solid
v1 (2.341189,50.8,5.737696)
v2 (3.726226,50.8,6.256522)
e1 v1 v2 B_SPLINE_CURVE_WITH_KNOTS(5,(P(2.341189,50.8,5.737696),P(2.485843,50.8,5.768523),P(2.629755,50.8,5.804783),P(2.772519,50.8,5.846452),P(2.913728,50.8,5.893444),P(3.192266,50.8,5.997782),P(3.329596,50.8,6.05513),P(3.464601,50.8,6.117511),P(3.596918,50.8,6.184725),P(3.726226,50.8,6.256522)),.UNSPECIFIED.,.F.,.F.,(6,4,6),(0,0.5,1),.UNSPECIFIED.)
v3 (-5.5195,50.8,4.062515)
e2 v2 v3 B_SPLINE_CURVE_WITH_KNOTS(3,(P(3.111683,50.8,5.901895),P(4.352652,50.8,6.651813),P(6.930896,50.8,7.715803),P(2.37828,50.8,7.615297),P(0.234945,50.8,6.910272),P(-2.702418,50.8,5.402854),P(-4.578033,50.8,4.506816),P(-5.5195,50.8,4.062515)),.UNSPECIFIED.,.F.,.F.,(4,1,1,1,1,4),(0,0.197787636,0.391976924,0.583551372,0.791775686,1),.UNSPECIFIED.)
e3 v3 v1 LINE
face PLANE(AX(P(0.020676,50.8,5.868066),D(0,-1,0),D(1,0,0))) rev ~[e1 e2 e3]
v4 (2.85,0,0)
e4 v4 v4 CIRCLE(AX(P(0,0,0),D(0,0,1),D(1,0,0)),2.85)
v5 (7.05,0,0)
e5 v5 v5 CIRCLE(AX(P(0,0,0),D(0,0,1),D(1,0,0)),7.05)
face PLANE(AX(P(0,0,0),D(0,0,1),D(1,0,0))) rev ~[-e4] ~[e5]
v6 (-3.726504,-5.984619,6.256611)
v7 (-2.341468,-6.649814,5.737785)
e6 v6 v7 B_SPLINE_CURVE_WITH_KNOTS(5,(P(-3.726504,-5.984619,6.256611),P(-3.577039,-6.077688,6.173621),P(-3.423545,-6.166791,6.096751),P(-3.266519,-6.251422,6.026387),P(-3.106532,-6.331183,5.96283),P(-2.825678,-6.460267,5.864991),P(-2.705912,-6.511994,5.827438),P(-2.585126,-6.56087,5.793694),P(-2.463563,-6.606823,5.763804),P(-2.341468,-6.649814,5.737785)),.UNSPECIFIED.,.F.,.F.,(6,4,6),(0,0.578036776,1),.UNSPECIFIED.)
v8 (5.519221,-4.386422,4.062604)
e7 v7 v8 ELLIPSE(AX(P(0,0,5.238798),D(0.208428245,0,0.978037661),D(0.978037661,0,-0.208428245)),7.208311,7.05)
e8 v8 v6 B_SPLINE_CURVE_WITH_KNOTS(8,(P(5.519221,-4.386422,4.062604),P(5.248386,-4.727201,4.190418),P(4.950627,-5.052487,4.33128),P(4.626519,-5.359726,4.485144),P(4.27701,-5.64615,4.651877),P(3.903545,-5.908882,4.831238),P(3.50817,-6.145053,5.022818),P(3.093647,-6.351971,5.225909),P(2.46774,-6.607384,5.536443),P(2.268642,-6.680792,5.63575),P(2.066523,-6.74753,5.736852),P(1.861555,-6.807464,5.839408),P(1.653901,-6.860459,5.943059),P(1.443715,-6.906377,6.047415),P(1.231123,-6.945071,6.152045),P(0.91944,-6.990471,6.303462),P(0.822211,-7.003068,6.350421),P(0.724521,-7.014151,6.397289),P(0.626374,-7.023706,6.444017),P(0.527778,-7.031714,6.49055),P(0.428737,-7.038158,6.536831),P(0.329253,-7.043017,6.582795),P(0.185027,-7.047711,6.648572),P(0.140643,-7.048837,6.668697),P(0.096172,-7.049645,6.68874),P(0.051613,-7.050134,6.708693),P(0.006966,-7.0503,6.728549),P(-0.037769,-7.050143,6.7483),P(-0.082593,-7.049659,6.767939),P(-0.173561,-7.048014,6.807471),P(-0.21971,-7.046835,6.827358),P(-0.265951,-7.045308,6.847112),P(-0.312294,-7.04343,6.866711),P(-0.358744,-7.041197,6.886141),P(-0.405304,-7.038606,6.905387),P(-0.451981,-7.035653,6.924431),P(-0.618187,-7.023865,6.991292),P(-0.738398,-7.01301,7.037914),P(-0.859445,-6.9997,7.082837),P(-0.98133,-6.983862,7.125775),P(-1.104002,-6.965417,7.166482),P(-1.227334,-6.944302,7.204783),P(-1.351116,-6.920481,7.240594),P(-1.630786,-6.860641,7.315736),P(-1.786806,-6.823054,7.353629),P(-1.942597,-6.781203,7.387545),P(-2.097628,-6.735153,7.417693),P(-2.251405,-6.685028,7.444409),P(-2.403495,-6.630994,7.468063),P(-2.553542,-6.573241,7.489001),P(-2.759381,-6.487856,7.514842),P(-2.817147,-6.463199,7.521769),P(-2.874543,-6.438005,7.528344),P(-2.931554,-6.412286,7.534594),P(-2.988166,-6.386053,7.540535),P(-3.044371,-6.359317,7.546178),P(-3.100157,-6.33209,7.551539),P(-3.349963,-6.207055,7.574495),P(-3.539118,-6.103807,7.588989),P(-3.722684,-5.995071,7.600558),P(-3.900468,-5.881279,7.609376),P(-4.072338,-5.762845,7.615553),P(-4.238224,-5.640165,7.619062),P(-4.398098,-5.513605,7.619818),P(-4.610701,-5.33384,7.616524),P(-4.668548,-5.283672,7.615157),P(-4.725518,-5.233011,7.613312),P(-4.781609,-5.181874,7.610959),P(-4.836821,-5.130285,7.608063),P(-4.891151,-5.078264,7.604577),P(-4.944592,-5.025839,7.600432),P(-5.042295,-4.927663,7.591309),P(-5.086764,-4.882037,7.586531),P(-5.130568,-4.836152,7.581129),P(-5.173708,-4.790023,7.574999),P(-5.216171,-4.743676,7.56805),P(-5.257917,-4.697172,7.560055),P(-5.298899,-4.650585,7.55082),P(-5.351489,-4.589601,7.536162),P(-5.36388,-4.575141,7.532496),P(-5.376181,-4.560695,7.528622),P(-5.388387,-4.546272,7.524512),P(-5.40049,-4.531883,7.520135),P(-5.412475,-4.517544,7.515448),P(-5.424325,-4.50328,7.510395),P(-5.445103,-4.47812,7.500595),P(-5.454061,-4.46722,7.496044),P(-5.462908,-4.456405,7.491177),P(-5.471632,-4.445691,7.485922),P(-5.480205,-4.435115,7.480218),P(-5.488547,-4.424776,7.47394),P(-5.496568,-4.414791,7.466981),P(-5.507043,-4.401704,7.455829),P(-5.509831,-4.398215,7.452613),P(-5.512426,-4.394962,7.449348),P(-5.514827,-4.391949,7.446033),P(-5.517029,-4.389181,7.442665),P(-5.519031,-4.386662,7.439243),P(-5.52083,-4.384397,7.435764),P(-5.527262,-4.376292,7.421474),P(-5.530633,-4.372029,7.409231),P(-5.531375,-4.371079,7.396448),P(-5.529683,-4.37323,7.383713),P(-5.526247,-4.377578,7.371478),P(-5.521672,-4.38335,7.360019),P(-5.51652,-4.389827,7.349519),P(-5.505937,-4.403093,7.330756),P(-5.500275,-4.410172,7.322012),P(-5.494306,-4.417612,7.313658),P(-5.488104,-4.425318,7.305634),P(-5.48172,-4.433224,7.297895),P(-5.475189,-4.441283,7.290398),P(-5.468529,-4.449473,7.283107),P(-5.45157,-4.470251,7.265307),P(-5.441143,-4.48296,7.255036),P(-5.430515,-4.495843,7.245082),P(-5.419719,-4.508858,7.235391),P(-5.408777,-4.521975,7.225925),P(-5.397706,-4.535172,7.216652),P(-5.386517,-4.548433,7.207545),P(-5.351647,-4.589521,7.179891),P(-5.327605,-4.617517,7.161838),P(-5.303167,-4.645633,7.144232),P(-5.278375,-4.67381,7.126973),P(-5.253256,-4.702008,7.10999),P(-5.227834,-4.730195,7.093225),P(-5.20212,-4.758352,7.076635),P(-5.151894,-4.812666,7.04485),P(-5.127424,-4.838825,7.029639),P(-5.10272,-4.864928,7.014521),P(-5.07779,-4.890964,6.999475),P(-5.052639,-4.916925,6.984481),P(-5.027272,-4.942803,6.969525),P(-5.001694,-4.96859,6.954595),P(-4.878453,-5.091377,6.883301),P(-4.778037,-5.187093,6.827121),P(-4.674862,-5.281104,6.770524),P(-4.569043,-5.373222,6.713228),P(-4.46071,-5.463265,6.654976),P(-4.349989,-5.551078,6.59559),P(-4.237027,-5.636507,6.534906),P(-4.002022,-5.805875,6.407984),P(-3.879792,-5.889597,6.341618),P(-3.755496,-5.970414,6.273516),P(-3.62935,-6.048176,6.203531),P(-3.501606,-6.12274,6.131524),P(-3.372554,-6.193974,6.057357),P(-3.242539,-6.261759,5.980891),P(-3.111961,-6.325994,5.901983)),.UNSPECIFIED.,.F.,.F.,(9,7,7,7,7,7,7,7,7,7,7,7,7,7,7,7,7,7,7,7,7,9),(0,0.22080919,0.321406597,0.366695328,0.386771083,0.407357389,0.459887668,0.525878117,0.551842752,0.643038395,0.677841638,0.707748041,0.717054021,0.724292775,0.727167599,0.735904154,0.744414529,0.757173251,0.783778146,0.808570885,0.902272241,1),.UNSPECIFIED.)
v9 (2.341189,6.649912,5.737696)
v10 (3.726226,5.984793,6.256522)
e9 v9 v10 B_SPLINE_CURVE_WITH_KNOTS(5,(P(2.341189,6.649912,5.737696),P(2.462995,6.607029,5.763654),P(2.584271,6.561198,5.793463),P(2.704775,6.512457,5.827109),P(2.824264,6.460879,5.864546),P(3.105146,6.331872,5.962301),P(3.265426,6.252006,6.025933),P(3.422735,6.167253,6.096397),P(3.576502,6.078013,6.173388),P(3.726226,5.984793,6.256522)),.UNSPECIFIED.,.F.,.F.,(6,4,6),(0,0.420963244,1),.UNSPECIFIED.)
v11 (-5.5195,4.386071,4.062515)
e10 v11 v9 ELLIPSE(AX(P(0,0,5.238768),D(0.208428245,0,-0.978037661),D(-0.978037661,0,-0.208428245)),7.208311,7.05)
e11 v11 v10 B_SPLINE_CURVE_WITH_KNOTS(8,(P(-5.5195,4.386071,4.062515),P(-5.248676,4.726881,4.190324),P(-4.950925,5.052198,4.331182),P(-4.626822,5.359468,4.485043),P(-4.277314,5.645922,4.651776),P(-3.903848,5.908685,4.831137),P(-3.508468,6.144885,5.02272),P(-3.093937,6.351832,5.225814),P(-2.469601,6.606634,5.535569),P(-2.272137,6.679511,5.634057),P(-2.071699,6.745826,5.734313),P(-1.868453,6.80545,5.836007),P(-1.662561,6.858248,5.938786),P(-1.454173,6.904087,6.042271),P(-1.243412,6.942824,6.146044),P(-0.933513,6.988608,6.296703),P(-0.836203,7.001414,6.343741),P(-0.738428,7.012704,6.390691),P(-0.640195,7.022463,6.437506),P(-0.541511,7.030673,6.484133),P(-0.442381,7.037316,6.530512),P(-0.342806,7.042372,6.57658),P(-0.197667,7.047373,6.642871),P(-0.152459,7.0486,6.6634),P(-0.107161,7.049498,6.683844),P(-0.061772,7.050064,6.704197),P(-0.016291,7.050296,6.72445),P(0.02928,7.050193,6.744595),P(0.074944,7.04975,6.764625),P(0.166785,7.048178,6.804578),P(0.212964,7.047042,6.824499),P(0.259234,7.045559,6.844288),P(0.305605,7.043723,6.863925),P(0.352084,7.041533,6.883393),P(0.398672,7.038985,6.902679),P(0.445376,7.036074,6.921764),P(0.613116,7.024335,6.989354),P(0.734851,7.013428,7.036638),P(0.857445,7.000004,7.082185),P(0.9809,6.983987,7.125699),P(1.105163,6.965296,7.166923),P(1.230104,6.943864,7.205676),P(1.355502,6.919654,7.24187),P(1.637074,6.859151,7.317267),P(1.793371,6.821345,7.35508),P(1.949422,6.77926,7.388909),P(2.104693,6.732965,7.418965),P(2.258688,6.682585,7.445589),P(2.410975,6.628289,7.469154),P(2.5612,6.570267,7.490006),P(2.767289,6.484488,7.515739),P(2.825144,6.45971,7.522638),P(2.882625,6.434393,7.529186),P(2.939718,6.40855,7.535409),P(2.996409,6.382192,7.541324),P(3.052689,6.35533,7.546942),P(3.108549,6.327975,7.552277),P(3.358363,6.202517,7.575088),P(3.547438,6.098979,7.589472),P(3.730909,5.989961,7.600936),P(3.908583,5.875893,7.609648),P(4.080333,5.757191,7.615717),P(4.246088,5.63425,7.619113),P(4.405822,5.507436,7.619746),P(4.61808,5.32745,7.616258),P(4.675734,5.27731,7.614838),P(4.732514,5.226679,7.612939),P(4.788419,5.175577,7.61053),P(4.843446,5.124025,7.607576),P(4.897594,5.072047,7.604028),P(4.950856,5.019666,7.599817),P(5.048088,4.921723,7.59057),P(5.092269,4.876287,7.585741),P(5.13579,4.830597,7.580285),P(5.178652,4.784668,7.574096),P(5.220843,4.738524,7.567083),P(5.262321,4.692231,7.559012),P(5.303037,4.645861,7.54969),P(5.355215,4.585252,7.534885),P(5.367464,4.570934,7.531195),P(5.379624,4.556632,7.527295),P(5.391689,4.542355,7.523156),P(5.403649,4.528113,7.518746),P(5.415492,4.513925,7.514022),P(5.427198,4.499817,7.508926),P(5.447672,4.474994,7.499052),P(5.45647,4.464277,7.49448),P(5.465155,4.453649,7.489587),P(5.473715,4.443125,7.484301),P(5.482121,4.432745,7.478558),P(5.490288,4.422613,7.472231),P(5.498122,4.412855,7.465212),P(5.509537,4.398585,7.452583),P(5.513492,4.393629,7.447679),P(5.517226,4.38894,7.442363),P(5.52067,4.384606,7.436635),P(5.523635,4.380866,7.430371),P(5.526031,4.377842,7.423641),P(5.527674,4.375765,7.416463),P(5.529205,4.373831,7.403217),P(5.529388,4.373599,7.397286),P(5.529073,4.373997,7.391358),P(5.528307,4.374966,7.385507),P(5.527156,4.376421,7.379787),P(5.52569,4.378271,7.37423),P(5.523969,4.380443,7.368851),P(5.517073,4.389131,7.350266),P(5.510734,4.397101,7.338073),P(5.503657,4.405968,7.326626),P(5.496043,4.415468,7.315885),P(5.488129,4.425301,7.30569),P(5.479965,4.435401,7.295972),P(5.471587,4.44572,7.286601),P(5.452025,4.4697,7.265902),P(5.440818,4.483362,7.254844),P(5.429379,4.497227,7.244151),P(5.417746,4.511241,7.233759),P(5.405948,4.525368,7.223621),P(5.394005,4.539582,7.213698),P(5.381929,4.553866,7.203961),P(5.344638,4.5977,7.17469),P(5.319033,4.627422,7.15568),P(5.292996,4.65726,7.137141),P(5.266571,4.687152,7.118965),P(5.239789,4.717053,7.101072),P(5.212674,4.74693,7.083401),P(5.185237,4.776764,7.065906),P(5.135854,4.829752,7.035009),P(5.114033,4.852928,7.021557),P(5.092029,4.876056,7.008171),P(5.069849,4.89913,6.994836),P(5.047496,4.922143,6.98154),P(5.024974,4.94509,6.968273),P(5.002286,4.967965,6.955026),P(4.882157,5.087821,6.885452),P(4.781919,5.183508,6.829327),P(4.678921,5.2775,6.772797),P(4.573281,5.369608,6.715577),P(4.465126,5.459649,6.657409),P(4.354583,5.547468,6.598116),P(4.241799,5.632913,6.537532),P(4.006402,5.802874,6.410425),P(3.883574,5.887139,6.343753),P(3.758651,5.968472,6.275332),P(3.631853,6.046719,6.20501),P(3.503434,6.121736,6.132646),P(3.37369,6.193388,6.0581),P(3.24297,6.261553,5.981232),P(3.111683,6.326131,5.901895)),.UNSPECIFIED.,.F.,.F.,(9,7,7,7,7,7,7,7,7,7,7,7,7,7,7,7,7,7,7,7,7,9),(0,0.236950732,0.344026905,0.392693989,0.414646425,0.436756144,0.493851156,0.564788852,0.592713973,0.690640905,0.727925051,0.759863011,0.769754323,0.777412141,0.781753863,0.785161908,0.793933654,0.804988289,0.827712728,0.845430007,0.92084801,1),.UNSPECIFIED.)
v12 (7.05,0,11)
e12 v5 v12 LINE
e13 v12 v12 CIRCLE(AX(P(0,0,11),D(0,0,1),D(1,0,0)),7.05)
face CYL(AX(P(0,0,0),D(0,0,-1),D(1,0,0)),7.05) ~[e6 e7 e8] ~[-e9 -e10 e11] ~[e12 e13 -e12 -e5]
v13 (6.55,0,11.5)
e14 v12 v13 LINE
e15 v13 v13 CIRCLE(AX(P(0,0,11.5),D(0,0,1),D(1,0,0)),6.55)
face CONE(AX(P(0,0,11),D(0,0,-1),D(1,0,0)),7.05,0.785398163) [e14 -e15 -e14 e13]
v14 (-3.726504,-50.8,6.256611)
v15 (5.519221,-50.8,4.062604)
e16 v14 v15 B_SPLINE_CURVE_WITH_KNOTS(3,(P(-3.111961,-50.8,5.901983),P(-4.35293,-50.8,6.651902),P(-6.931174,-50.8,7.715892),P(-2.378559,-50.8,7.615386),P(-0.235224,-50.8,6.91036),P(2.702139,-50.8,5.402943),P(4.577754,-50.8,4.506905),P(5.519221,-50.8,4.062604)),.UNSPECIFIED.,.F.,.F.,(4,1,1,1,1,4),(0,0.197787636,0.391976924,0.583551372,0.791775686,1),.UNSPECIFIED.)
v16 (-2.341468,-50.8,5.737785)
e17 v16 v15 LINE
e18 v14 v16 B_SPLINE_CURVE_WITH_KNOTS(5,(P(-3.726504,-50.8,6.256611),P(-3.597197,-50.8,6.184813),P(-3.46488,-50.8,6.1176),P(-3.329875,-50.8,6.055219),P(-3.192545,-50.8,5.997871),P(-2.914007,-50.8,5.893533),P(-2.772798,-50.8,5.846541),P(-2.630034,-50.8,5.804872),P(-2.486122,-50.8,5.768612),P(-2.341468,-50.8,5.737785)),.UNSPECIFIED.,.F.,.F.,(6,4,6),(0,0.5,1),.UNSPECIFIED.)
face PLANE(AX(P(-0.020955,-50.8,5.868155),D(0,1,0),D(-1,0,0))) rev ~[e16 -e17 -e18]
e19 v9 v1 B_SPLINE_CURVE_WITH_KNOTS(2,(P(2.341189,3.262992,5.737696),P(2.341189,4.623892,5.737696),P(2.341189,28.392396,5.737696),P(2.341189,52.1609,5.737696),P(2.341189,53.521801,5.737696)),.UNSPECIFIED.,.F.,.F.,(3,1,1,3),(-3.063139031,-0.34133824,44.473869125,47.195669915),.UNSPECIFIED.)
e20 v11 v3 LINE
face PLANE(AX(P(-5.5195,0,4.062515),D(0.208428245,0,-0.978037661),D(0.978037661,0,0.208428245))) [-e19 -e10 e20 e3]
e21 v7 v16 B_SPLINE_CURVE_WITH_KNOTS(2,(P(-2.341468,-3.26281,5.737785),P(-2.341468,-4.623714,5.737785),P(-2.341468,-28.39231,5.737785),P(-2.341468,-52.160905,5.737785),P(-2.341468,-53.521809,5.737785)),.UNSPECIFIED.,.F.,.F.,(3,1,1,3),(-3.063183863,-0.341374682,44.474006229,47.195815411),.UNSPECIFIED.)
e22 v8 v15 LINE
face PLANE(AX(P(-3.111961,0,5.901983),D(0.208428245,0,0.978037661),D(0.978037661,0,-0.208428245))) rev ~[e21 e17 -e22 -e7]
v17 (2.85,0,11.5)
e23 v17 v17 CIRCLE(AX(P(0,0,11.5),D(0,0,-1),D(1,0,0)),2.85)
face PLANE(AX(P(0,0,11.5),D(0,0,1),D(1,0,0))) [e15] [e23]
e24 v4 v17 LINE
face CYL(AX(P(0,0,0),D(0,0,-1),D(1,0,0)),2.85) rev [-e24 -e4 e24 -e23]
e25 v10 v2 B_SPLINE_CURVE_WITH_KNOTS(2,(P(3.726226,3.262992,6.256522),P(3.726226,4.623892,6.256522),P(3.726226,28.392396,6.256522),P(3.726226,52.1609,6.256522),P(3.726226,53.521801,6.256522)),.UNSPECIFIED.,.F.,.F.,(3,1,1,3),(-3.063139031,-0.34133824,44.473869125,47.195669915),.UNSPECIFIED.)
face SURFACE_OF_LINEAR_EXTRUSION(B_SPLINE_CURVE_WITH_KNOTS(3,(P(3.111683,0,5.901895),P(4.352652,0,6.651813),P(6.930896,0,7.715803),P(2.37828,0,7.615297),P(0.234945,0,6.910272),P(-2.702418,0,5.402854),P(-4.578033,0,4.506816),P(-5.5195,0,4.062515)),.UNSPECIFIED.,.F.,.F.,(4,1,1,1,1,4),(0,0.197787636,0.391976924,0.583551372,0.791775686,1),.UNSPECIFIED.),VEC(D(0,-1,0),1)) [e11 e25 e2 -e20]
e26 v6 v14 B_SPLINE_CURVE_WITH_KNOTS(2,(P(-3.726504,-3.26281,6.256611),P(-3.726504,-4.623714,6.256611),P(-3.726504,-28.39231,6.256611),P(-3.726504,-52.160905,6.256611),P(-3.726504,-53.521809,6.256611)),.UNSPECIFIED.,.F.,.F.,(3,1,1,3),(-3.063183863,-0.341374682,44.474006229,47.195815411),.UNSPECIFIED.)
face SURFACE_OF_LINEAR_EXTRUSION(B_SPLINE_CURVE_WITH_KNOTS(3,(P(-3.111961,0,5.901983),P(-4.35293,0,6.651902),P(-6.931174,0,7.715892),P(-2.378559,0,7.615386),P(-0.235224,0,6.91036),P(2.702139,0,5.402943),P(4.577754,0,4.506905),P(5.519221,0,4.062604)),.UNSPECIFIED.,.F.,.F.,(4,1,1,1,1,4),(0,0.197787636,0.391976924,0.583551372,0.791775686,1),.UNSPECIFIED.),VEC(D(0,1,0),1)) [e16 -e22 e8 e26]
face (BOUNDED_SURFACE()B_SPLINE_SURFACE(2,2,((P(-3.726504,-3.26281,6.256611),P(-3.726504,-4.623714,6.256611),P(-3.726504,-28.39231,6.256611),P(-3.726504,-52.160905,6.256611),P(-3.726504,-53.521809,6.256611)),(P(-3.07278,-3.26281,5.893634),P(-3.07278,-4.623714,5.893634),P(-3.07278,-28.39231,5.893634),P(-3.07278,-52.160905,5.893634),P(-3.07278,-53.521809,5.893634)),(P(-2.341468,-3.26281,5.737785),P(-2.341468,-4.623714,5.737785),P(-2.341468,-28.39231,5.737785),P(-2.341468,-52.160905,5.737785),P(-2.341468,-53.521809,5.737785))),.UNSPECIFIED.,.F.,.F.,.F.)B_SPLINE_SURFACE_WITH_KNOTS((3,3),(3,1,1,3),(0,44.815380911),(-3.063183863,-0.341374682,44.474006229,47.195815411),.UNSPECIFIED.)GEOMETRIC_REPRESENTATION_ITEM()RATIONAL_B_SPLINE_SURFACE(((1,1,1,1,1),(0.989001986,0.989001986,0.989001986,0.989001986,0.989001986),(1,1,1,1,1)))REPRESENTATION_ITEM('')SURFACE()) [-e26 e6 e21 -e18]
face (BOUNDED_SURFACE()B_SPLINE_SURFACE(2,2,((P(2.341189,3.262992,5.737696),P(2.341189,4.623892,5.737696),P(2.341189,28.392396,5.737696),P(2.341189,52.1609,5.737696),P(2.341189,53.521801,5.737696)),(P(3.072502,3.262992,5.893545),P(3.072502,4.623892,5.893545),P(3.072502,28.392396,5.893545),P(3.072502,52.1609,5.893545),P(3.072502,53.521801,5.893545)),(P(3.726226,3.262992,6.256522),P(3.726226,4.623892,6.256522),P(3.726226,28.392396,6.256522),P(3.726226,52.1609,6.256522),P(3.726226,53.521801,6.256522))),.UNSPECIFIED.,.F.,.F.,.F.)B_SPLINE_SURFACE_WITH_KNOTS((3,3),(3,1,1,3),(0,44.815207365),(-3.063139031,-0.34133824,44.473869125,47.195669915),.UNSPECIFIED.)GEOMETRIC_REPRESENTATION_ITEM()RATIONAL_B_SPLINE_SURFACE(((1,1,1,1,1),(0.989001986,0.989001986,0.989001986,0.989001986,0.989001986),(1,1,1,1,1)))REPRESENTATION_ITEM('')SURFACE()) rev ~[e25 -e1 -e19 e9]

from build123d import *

# Parameters (mm, degrees)
F0_R     = 7.05
F0_R_2   = 2.85
F1_DEPTH = 11.5
F3_DEPTH = 50.8
F4_R     = 5
F6_DEPTH = 50.8
F7_R     = 5
F8_DEPTH = 25
F9_SIZE  = 0.5


# Not quite as in the source:
# - a feature names something its author has since deleted; it is built from what else it names


with BuildPart() as f1:
    # F0 (on Top) → F1 (new body)
    with BuildSketch(Plane.XY):
        Circle(F0_R)
        Circle(F0_R_2, mode=Mode.SUBTRACT)
        Circle(F0_R_2)
    extrude(amount=F1_DEPTH)

    # F2 (on Front) → F3 (join)
    with BuildSketch(Plane.XZ):
        with BuildLine():
            add(Edge.make_bspline(
                [(-3.1119612486, 5.9019833995), (-4.352930456, 6.6519015813), (-6.9311743253, 7.7158918454), (-2.3785587972, 7.6153860853), (-0.2352237379, 6.910360475), (2.7021392414, 5.4029427526), (4.5777539416, 4.5069045056), (5.5192211105, 4.0626041336)],
                knots=[0, 0, 0, 0, 0.1977876363, 0.3919769243, 0.5835513721, 0.7917756861, 1, 1, 1, 1], degree=3))
            Line((-3.1119612486, 5.9019833995), (5.5192211105, 4.0626041336))
        make_face()
    extrude(amount=F3_DEPTH)

    # F4
    f4_edges = [f1.edges().sort_by_distance(p)[0] for p in [
        (-3.111961, -28.562997, 5.901983),
    ]]
    fillet(f4_edges, radius=F4_R)

    # F5 (on Front) → F6 (join)
    with BuildSketch(Plane.XZ):
        with BuildLine():
            Line((-5.5194998324, 4.0625152563), (3.1116825268, 5.9018945222))
            add(Edge.make_bspline(
                [(3.1116825268, 5.9018945222), (4.3526517342, 6.651812704), (6.9308956034, 7.7158029681), (2.3782800753, 7.615297208), (0.2349450161, 6.9102715977), (-2.7024179633, 5.4028538753), (-4.5780326634, 4.5068156283), (-5.5194998324, 4.0625152563)],
                knots=[0, 0, 0, 0, 0.1977876363, 0.3919769243, 0.5835513721, 0.7917756861, 1, 1, 1, 1], degree=3))
        make_face()
    extrude(amount=-F6_DEPTH)

    # F7
    f7_edges = [f1.edges().sort_by_distance(p)[0] for p in [
        (3.111683, 28.563065, 5.901895),
    ]]
    fillet(f7_edges, radius=F7_R)

    # F0 (on Top) → F8 (cut)
    with BuildSketch(Plane.XY):
        Circle(F0_R_2)
    extrude(amount=F8_DEPTH, mode=Mode.SUBTRACT)

    # F9
    f9_edges = [f1.edges().sort_by_distance(p)[0] for p in [
        (-7.05, 0, 11.5),
    ]]
    chamfer(f9_edges, length=F9_SIZE)


solid = f1.part
